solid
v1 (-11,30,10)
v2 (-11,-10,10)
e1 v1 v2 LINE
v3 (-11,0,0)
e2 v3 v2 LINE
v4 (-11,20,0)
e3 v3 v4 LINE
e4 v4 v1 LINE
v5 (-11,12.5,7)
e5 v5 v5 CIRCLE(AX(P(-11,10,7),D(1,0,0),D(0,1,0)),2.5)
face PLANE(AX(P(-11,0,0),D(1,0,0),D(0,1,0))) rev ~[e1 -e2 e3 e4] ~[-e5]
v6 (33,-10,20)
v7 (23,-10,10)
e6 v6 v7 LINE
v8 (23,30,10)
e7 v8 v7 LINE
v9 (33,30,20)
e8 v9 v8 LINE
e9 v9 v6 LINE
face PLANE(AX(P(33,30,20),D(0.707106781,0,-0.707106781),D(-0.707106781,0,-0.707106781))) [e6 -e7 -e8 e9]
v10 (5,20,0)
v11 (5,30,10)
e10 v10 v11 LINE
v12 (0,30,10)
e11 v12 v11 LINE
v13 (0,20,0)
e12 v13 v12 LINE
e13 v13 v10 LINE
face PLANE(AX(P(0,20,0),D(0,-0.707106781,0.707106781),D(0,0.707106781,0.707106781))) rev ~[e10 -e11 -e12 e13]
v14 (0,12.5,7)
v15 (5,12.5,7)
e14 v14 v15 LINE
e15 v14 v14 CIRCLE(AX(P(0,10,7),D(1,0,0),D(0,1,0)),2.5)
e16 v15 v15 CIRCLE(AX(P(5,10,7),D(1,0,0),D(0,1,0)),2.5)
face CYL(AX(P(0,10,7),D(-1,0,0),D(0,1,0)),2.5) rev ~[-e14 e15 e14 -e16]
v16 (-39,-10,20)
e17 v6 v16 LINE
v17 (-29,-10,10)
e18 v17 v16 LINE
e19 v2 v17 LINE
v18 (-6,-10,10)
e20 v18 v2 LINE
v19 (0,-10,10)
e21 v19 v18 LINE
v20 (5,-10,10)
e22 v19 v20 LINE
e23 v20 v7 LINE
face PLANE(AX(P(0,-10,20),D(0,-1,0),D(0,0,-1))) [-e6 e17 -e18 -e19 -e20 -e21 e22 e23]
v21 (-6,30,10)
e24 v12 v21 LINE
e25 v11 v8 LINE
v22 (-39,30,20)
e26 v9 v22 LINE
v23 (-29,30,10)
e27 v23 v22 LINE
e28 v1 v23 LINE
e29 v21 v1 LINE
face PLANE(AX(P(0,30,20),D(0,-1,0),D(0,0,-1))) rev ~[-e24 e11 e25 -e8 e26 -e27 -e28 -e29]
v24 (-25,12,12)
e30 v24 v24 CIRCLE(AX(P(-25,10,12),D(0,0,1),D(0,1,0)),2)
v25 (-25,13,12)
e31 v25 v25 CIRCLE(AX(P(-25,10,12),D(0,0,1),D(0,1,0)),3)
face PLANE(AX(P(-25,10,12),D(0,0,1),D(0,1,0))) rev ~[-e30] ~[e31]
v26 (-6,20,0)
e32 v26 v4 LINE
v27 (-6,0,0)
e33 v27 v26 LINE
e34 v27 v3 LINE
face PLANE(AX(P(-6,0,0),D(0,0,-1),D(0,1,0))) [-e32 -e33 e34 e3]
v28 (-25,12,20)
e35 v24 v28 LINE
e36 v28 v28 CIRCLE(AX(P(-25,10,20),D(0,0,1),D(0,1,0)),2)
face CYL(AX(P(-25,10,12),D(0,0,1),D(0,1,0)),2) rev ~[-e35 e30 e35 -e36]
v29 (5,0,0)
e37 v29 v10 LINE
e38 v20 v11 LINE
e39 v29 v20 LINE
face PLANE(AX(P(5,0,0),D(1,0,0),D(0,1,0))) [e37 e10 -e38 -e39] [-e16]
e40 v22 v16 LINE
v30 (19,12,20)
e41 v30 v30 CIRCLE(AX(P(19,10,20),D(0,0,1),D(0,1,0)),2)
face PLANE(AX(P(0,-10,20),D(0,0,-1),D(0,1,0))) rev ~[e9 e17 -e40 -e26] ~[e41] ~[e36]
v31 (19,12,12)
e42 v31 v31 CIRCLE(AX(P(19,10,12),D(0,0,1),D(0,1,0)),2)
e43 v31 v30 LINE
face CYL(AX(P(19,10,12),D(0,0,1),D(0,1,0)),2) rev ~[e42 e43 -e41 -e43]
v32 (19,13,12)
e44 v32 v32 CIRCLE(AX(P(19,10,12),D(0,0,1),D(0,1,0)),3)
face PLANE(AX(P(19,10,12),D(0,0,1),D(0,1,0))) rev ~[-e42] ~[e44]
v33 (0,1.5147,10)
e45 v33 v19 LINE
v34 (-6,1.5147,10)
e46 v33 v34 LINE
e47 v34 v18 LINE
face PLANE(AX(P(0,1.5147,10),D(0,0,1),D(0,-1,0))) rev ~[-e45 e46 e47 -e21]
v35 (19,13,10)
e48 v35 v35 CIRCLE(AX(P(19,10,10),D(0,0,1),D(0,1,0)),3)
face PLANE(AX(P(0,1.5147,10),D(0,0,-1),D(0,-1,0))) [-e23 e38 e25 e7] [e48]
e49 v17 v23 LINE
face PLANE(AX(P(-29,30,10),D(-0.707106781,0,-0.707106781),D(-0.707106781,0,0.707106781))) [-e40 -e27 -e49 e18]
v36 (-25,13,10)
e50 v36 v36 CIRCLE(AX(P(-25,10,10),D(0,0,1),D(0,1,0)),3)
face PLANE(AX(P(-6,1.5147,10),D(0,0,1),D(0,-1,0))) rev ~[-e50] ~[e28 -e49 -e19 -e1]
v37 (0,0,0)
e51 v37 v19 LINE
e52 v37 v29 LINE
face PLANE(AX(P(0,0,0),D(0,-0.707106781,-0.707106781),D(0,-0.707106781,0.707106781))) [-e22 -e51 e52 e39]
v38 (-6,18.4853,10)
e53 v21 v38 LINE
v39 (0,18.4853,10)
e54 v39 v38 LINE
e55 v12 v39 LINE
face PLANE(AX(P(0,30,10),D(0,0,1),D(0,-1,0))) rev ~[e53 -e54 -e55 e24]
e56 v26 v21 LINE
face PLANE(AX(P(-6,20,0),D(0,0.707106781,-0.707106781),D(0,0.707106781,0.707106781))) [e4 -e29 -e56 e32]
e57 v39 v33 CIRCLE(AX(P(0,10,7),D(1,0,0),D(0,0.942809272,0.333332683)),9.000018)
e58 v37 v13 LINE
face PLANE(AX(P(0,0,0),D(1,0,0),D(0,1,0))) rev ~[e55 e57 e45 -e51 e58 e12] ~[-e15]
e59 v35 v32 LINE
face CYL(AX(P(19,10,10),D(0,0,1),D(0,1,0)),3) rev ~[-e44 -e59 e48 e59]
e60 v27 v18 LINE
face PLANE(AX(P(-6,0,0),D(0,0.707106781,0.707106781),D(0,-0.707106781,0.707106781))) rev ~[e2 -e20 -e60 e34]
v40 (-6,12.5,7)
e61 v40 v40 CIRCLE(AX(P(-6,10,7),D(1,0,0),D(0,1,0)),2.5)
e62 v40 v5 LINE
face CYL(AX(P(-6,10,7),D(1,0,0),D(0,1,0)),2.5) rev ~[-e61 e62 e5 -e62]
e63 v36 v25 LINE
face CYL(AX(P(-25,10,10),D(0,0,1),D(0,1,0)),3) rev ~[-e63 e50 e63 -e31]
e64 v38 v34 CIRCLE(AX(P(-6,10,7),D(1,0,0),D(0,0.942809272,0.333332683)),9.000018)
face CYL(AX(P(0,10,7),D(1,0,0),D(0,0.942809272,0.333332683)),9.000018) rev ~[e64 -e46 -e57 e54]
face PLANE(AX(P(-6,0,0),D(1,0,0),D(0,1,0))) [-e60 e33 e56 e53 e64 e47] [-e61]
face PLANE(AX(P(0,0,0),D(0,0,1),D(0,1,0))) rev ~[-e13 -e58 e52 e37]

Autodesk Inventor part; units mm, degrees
ref_plane "YZ Plane" through (0, 0, 0) normal (1, 0, 0) x (0, 1, 0)
ref_plane "XZ Plane" through (0, 0, 0) normal (0, 1, 0) x (-1, 0, 0)
ref_plane "XY Plane" through (0, 0, 0) normal (0, 0, 1) x (1, 0, 0)
sketch "Sketch2" plane through (0, 0, 0) normal (1, 0, 0) x (0, 1, 0)
  line L0 (0, 0) -> (20, 0)
  line L1 (30, 10) -> (-10, 10)
  line L2 (-10, 20) -> (-10, 10)
  line L3 (30, 20) -> (30, 10)
  line L4 (20, 0) -> (30, 10)
  line L5 (0, 0) -> (-10, 10)
  line L6 (10, 0) -> (10, 7) construction
  circle A0 centre (10, 7) radius 2.5
  circle A1 centre (10, 7) radius 8 construction
  line L7 (-10, 20) -> (30, 20)
  arc A2 (18.4853, 10) -> (1.5147, 10) centre (10, 7) ccw
  point P0 (10, 10)
  point P1 (1.9377, 11)
  dimension "d12" = 10
  dimension "d15" = 45
  dimension "d16" = 20
  dimension "d17" = 7
  dimension "d18" = 5
  dimension "d19" = 16
  dimension "square_thickness" = 10
  dimension "d22" = 9
  dimension "d55" = 11
extrude "Extrusion1" add sketch "Sketch2" along normal blind 5 contours L5 L1 L4 L0
extrude "Extrusion2" add sketch "Sketch2" against normal blind 6 contours L2 L7 L3 L1 A2
extrude "Extrusion3" add sketch "Sketch2" against normal blind 5 from surface at -6 contours L5 L1 L4 L0
extrude "Extrusion4" add sketch "Sketch2" along normal blind 23 contours L2 L7 L3 L1 A2 | A2 L1
extrude "Extrusion5" add sketch "Sketch2" against normal blind 23 from surface at -6 contours L2 L7 L3 L1 A2 | A2 L1
sketch "Sketch4" plane through (23, 30, 10) normal (0, 0, -1) x (-1, 0, 0)
  line L0 (52, -40) -> (52, 0) construction
  line L1 (52, -20) -> (0, -20) construction
  line L2 (0, 0) -> (0, -40) construction
  circle A0 centre (4, -20) radius 2
  line L3 (0, -40) -> (0, 0) construction
  circle A1 centre (48, -20) radius 2
  line L4 (52, 0) -> (52, -40) construction
  point P0 (23, -30)
  dimension "d39" = 4
  dimension "d40" = 4
  dimension "d41" = 4
  dimension "d42" = 4
hole "Hole1" at (19, 10, 10) at (-25, 10, 10) direction (0, 0, 1) diameter 4 end through all counterbore diameter 6 counterbore depth 2
sketch "Sketch5" plane through (-6, 30, 10) normal (0, 1, 0) x (1, 0, 0)
  line L0 (-23, -10) -> (-23, 0) projected
  line L1 (-23, 0) -> (-33, -10)
  line L2 (-33, -10) -> (-23, -10)
  line L3 (-23, -10) -> (29, -10) projected
  line L4 (29, -10) -> (39, -10)
  line L5 (29, 0) -> (29, -10) projected
  line L6 (39, -10) -> (29, 0)
  point P0 (6, 10)
  dimension "d51" = 45
  dimension "d52" = 45
extrude "Extrusion6" add sketch "Sketch5" against normal up to surface (40 mm away)
equation "\"d18\" = ball_bearing_ID"
equation "\"d19\" = ball_bearing_OD"
equation "\"d33\" = d29"
equation "\"d39\" = screw_size"
equation "\"d40\" = screw_size"
equation "\"d41\" = screw_size"
equation "\"d42\" = screw_size"
equation "\"d43\" = screw_size"
equation "\"ball_bearing_ID\" = 5"
equation "\"ball_bearing_OD\" = 16"
equation "\"ball_bearing_width\" = 5"
equation "\"screw_size\" = 4"
equation "\"d29\" = 23"
properties part number "3_inner_glider_carriage"
